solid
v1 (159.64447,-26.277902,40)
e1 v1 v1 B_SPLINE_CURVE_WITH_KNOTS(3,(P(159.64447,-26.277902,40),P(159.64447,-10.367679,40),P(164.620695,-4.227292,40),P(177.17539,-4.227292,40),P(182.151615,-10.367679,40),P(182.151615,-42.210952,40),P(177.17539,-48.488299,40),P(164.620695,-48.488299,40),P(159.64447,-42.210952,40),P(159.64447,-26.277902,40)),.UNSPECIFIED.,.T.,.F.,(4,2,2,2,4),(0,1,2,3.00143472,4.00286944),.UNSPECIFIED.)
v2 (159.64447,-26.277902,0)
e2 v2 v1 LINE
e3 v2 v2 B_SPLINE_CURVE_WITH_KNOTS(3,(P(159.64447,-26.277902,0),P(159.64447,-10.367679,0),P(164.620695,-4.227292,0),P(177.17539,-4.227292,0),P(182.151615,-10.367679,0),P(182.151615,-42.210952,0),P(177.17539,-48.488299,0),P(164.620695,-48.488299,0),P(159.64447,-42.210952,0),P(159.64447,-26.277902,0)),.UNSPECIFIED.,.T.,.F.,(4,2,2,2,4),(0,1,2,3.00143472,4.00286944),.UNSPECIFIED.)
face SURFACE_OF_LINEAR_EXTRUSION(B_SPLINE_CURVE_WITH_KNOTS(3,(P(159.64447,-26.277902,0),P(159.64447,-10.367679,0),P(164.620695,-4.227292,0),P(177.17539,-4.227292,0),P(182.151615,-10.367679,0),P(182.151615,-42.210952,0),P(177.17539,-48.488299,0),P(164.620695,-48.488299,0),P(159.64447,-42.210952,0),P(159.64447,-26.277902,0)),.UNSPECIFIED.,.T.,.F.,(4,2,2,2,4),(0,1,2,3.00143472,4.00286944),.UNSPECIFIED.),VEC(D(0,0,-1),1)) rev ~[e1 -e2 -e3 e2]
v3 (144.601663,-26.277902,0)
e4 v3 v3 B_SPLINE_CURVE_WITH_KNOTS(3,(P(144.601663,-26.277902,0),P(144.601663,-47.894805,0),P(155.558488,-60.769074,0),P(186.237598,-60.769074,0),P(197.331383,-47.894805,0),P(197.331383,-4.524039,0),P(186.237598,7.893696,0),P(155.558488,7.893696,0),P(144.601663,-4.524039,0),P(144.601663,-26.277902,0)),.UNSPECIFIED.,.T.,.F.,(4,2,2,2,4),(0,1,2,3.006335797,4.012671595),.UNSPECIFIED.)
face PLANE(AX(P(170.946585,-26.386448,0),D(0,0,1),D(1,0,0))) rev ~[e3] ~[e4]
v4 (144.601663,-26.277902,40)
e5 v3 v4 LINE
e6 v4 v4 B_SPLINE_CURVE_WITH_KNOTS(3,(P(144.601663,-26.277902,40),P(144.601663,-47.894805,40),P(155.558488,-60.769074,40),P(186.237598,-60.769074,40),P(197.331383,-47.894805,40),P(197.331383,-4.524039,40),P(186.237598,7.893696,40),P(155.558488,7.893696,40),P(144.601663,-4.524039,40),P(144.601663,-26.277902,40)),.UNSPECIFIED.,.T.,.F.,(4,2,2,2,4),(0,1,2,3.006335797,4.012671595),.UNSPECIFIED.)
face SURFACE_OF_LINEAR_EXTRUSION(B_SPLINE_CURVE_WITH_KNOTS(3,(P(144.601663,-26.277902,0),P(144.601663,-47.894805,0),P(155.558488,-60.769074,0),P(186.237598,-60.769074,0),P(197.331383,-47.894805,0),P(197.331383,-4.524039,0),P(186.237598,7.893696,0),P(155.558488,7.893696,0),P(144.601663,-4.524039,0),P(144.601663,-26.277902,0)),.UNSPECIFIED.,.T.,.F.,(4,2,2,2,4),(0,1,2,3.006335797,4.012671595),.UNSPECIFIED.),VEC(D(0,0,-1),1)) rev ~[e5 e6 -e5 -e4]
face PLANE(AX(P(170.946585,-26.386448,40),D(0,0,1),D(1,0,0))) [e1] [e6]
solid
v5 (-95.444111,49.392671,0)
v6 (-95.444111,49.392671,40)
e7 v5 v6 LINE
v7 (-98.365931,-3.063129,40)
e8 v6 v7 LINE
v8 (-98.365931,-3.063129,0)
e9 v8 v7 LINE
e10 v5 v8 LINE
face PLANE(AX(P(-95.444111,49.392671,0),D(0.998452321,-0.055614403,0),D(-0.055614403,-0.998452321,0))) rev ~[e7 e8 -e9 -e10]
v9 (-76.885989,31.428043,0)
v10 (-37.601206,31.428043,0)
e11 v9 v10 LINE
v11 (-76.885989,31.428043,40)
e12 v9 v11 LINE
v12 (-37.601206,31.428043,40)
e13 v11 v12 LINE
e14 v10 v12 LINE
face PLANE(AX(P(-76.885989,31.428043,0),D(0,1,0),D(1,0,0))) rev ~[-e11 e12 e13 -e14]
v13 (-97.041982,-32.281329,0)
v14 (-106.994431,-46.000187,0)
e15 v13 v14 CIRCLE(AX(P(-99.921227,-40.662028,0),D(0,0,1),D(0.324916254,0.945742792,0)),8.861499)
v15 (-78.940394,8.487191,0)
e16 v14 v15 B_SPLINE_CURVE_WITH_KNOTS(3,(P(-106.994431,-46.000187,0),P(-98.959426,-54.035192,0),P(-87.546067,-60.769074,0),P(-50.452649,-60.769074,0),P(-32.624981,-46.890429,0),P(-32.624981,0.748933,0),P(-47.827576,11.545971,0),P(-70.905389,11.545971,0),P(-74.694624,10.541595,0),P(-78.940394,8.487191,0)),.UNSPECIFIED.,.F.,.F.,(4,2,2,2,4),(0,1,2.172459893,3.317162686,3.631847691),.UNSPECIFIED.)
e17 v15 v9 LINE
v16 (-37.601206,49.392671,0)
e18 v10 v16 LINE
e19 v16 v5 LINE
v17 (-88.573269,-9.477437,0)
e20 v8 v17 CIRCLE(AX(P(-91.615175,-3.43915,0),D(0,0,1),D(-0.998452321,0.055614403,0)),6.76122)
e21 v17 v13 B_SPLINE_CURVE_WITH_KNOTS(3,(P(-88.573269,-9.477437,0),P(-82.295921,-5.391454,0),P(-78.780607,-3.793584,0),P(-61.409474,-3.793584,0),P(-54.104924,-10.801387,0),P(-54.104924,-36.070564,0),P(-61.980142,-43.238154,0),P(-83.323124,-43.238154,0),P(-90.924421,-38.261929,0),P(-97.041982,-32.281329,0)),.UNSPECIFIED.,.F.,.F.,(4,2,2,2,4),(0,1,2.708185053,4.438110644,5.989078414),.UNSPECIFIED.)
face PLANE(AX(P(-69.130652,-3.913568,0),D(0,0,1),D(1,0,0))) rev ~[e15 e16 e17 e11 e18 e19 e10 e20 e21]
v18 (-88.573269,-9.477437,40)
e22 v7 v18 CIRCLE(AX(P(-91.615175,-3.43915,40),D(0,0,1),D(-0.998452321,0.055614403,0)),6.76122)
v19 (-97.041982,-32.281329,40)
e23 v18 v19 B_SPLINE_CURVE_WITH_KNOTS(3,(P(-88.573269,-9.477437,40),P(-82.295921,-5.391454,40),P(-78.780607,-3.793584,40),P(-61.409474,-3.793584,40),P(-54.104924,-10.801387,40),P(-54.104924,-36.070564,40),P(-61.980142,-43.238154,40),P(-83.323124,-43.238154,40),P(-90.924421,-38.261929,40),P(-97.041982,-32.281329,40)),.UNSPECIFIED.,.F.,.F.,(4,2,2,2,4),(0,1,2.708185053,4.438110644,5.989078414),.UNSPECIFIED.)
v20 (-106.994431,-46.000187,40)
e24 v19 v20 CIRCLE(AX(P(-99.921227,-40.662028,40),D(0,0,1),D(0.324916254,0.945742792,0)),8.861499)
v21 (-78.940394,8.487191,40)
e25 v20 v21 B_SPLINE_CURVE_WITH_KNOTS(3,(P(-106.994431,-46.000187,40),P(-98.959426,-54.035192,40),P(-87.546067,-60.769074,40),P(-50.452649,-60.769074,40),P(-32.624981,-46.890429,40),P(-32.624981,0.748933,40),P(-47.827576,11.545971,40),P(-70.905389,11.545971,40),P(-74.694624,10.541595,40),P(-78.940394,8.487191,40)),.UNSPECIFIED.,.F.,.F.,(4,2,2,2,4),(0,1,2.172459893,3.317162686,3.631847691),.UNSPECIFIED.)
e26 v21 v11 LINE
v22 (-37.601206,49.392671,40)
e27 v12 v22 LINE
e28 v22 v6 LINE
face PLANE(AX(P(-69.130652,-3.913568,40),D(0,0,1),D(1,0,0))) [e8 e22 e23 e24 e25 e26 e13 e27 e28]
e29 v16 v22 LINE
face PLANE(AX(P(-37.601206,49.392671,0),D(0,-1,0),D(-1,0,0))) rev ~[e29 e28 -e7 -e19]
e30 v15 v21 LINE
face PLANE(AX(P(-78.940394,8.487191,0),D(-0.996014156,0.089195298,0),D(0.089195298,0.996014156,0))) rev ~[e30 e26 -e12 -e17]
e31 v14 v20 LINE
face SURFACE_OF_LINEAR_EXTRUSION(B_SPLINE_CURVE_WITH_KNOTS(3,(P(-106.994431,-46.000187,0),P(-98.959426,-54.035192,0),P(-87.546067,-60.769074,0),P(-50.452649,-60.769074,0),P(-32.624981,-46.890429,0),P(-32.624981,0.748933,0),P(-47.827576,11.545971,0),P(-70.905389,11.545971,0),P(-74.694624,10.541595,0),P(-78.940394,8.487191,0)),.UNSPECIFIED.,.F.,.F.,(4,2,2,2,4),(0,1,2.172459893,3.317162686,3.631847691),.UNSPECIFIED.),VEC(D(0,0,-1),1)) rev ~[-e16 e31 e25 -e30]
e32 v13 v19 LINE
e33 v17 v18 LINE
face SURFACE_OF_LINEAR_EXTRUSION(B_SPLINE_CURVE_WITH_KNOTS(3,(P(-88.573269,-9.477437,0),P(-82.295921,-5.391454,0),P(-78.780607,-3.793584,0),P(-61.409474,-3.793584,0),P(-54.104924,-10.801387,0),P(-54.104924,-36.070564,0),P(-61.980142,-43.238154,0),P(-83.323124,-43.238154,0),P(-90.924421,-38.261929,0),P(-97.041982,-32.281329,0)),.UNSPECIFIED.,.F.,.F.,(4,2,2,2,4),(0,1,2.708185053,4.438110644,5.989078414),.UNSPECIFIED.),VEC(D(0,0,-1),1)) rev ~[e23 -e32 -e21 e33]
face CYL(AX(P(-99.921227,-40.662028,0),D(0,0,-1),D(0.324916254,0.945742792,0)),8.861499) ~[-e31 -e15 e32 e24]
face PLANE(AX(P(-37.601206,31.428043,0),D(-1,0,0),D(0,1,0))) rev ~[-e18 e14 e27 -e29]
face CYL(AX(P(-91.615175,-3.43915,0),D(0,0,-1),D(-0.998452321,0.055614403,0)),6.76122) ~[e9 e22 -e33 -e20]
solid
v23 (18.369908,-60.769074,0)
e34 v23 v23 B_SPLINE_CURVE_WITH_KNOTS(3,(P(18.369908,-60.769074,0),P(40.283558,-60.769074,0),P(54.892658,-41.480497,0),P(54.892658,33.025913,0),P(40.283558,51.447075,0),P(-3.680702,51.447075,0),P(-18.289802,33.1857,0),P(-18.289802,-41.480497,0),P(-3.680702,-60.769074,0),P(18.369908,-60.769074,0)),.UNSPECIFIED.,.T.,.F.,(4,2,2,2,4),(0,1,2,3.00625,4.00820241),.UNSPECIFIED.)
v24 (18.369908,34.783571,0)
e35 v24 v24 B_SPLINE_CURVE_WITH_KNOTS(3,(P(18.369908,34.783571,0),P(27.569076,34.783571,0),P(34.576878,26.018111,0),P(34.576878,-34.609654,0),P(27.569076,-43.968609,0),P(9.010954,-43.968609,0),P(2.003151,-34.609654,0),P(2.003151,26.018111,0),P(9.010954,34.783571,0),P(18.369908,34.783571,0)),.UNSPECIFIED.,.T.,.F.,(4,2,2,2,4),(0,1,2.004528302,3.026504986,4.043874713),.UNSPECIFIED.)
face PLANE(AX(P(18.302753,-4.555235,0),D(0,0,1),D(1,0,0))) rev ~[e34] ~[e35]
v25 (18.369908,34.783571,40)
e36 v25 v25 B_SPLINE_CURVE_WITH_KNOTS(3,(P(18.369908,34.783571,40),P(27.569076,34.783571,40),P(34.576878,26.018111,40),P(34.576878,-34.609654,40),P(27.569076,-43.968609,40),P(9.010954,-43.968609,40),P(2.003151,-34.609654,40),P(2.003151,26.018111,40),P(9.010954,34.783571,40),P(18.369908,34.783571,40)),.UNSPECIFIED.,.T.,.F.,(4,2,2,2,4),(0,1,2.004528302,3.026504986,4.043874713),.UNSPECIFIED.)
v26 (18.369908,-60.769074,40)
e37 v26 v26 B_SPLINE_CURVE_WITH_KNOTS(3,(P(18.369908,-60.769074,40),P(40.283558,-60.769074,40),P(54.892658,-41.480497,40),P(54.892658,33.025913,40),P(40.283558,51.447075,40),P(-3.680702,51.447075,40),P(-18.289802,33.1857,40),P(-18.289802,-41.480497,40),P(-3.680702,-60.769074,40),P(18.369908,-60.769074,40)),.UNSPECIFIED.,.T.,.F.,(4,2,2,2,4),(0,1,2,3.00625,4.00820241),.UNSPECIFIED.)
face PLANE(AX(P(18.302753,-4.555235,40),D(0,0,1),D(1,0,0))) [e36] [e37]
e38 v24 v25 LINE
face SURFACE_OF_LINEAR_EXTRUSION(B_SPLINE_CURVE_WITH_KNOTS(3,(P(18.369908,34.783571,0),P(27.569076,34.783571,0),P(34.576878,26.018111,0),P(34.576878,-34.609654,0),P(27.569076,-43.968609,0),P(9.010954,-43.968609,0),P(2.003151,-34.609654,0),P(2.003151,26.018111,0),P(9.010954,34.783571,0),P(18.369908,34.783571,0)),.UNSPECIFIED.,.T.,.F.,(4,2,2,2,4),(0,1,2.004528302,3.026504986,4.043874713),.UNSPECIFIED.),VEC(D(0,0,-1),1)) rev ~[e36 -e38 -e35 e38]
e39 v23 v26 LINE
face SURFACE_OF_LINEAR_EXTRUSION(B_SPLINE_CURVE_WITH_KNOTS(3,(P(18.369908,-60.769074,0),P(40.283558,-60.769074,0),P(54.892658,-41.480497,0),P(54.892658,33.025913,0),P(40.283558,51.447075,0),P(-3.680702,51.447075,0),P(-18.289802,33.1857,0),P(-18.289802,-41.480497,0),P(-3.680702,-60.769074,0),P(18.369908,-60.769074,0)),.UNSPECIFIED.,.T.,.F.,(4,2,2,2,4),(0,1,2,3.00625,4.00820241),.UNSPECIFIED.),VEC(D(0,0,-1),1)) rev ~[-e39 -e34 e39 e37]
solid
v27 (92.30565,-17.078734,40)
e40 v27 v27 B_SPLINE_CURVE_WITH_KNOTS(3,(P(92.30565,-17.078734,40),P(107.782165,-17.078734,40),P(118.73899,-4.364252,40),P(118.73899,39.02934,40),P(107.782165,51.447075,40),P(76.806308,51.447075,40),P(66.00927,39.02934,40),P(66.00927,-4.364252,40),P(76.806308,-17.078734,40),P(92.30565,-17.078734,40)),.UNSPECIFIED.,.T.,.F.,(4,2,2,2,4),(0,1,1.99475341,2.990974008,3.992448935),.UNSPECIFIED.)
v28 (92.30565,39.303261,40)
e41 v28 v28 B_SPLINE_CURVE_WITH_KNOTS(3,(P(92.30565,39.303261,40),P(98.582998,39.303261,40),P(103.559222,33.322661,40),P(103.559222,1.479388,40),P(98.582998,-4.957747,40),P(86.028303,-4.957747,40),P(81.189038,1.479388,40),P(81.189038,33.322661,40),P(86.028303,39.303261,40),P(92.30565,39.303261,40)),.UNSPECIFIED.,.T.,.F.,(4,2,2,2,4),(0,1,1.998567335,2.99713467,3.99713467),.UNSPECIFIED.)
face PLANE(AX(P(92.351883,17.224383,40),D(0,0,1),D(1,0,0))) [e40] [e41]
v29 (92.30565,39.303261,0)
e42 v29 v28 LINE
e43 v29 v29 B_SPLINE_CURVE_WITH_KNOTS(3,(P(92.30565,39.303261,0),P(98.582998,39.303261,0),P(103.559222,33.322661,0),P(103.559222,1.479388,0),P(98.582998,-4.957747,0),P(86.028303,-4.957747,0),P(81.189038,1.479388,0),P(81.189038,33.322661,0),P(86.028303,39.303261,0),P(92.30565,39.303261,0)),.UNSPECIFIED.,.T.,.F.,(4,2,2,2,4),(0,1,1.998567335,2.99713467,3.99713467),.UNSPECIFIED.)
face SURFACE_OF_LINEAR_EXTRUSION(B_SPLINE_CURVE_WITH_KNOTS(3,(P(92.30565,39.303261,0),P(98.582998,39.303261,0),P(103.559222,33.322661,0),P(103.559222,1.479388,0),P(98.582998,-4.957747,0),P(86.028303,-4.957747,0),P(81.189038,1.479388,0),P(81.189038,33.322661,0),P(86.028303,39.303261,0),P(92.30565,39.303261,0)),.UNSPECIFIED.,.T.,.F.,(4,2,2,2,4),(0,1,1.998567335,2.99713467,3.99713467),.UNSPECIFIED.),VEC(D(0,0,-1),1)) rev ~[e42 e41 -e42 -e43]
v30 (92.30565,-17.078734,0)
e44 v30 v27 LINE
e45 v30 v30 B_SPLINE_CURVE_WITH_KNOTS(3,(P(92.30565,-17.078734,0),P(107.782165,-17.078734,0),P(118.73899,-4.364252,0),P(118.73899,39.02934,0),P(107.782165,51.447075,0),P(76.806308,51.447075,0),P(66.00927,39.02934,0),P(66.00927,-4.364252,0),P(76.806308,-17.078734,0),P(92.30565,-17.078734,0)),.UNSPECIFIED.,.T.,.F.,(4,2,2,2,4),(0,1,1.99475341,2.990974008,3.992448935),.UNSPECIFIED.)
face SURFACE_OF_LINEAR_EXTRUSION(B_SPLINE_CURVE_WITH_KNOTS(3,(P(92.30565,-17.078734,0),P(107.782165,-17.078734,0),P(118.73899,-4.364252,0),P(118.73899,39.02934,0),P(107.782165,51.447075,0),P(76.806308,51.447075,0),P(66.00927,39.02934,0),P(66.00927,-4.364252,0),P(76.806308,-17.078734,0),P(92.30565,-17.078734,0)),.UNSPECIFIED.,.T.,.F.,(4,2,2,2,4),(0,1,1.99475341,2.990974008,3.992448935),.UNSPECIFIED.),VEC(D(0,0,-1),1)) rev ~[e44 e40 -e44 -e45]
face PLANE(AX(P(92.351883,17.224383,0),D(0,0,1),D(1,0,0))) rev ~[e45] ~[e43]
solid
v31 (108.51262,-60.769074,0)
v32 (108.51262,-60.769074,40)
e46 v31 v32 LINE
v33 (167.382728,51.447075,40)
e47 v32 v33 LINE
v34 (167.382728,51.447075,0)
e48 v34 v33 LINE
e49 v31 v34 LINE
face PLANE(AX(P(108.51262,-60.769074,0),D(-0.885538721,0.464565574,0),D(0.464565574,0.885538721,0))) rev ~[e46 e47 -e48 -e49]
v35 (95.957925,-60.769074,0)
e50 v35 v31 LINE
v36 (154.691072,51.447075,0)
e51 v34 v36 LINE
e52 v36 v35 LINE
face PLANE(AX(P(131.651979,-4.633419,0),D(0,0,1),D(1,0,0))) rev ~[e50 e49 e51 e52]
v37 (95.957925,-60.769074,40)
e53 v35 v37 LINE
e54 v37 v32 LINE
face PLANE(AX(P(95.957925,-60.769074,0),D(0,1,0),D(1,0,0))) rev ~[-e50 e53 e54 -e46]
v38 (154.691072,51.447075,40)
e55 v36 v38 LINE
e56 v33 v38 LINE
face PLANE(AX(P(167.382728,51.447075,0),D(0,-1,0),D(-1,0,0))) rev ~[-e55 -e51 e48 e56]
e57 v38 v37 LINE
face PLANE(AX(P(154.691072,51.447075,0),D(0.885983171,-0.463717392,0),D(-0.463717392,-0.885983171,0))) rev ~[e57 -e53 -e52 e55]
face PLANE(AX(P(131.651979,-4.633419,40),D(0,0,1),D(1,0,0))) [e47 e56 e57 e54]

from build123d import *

# Parameters (mm, degrees)
F2_DEPTH = 40


with BuildPart() as f2:
    # F1 (on Top) → F2 (new body)
    with BuildSketch(Plane.XY):
        with BuildLine():
            Line((-37.6012061267, 49.3926707034), (-95.4441113863, 49.3926707034))
            Line((-95.4441113863, 49.3926707034), (-98.3659313836, -3.0631289361))
            ThreePointArc((-98.3659313836, -3.0631289361), (-95.3198653418, -9.0950649064), (-88.5732690488, -9.477436899))
            add(Edge.make_bspline(
                [(-88.5732690488, -9.477436899), (-82.2959213983, -5.3914542465), (-78.780606714, -3.7935839355), (-72.3662987511, -3.7935839355)],
                knots=[0, 0, 0, 0, 1, 1, 1, 1], degree=3))
            add(Edge.make_bspline(
                [(-72.3662987511, -3.7935839355), (-61.4094737612, -3.7935839355), (-54.1049237678, -10.8013865853), (-54.1049237678, -23.3560818864)],
                knots=[0, 0, 0, 0, 1, 1, 1, 1], degree=3))
            add(Edge.make_bspline(
                [(-54.1049237678, -23.3560818864), (-54.1049237678, -36.0705642185), (-61.9801417294, -43.2381538994), (-73.2337140629, -43.2381538994)],
                knots=[0, 0, 0, 0, 1, 1, 1, 1], degree=3))
            add(Edge.make_bspline(
                [(-73.2337140629, -43.2381538994), (-83.3231237411, -43.2381538994), (-90.9244210779, -38.2619292165), (-97.0419816974, -32.2813289094)],
                knots=[0, 0, 0, 0, 1, 1, 1, 1], degree=3))
            ThreePointArc((-97.0419816974, -32.2813289094), (-107.0940288058, -35.4584640814), (-106.9944310633, -46.0001868657))
            add(Edge.make_bspline(
                [(-106.9944310633, -46.0001868657), (-98.9594260706, -54.0351918583), (-87.546066706, -60.7690738834), (-70.4716810966, -60.7690738834)],
                knots=[0, 0, 0, 0, 1, 1, 1, 1], degree=3))
            add(Edge.make_bspline(
                [(-70.4716810966, -60.7690738834), (-50.4526487712, -60.7690738834), (-32.6249814437, -46.8904288961), (-32.6249814437, -22.7854139181)],
                knots=[0, 0, 0, 0, 1, 1, 1, 1], degree=3))
            add(Edge.make_bspline(
                [(-32.6249814437, -22.7854139181), (-32.6249814437, 0.7489330916), (-47.8275761173, 11.5459710505), (-65.9291640695, 11.5459710505)],
                knots=[0, 0, 0, 0, 1, 1, 1, 1], degree=3))
            add(Edge.make_bspline(
                [(-65.9291640695, 11.5459710505), (-70.9053887525, 11.5459710505), (-74.6946240615, 10.5415954264), (-78.9403937451, 8.4871907408)],
                knots=[0, 0, 0, 0, 1, 1, 1, 1], degree=3))
            Line((-78.9403937451, 8.4871907408), (-76.8859890595, 31.4280430636))
            Line((-76.8859890595, 31.4280430636), (-37.6012061267, 31.4280430636))
            Line((-37.6012061267, 31.4280430636), (-37.6012061267, 49.3926707034))
        make_face()
    extrude(amount=F2_DEPTH)


with BuildPart() as f2b:
    # F1 (on Top) → F2, piece 2 (new body)
    with BuildSketch(Plane.XY):
        with BuildLine():
            add(Edge.make_bspline(
                [(54.8926581638, -4.2272915913), (54.8926581638, 33.0259133746), (40.2835581772, 51.4470753891), (18.3699081972, 51.4470753891)],
                knots=[0, 0, 0, 0, 1, 1, 1, 1], degree=3))
            add(Edge.make_bspline(
                [(18.3699081972, 51.4470753891), (-3.6807020952, 51.4470753891), (-18.2898020818, 33.1857004057), (-18.2898020818, -4.2272915913)],
                knots=[0, 0, 0, 0, 1, 1, 1, 1], degree=3))
            add(Edge.make_bspline(
                [(-18.2898020818, -4.2272915913), (-18.2898020818, -41.4804965573), (-3.6807020952, -60.7690738834), (18.3699081972, -60.7690738834)],
                knots=[0, 0, 0, 0, 1, 1, 1, 1], degree=3))
            add(Edge.make_bspline(
                [(18.3699081972, -60.7690738834), (40.2835581772, -60.7690738834), (54.8926581638, -41.4804965573), (54.8926581638, -4.2272915913)],
                knots=[0, 0, 0, 0, 1, 1, 1, 1], degree=3))
        make_face()
        with BuildLine():
            add(Edge.make_bspline(
                [(34.5768784949, -4.2272915913), (34.5768784949, -34.6096542198), (27.569075845, -43.9686088988), (18.3699081972, -43.9686088988)],
                knots=[0, 0, 0, 0, 1, 1, 1, 1], degree=3))
            add(Edge.make_bspline(
                [(18.3699081972, -43.9686088988), (9.0109535183, -43.9686088988), (2.0031508684, -34.6096542198), (2.0031508684, -4.2272915913)],
                knots=[0, 0, 0, 0, 1, 1, 1, 1], degree=3))
            add(Edge.make_bspline(
                [(2.0031508684, -4.2272915913), (2.0031508684, 26.0181107248), (9.0109535183, 34.7835707168), (18.3699081972, 34.7835707168)],
                knots=[0, 0, 0, 0, 1, 1, 1, 1], degree=3))
            add(Edge.make_bspline(
                [(18.3699081972, 34.7835707168), (27.569075845, 34.7835707168), (34.5768784949, 26.0181107248), (34.5768784949, -4.2272915913)],
                knots=[0, 0, 0, 0, 1, 1, 1, 1], degree=3))
        make_face(mode=Mode.SUBTRACT)
    extrude(amount=F2_DEPTH)


with BuildPart() as f2c:
    # F1 (on Top) → F2, piece 3 (new body)
    with BuildSketch(Plane.XY):
        with BuildLine():
            add(Edge.make_bspline(
                [(118.7389904492, 17.3896110452), (118.7389904492, 39.0293404004), (107.7821654593, 51.4470753891), (92.3056501609, 51.4470753891)],
                knots=[0, 0, 0, 0, 1, 1, 1, 1], degree=3))
            add(Edge.make_bspline(
                [(92.3056501609, 51.4470753891), (76.8063081438, 51.4470753891), (66.0092701849, 39.0293404004), (66.0092701849, 17.3896110452)],
                knots=[0, 0, 0, 0, 1, 1, 1, 1], degree=3))
            add(Edge.make_bspline(
                [(66.0092701849, 17.3896110452), (66.0092701849, -4.3642519037), (76.8063081438, -17.0787342358), (92.3056501609, -17.0787342358)],
                knots=[0, 0, 0, 0, 1, 1, 1, 1], degree=3))
            add(Edge.make_bspline(
                [(92.3056501609, -17.0787342358), (107.7821654593, -17.0787342358), (118.7389904492, -4.3642519037), (118.7389904492, 17.3896110452)],
                knots=[0, 0, 0, 0, 1, 1, 1, 1], degree=3))
        make_face()
        with BuildLine():
            add(Edge.make_bspline(
                [(103.5592224944, 17.3896110452), (103.5592224944, 1.479388091), (98.5829978114, -4.9577465907), (92.3056501609, -4.9577465907)],
                knots=[0, 0, 0, 0, 1, 1, 1, 1], degree=3))
            add(Edge.make_bspline(
                [(92.3056501609, -4.9577465907), (86.0283025104, -4.9577465907), (81.1890381398, 1.479388091), (81.1890381398, 17.3896110452)],
                knots=[0, 0, 0, 0, 1, 1, 1, 1], degree=3))
            add(Edge.make_bspline(
                [(81.1890381398, 17.3896110452), (81.1890381398, 33.3226607181), (86.0283025104, 39.3032610251), (92.3056501609, 39.3032610251)],
                knots=[0, 0, 0, 0, 1, 1, 1, 1], degree=3))
            add(Edge.make_bspline(
                [(92.3056501609, 39.3032610251), (98.5829978114, 39.3032610251), (103.5592224944, 33.3226607181), (103.5592224944, 17.3896110452)],
                knots=[0, 0, 0, 0, 1, 1, 1, 1], degree=3))
        make_face(mode=Mode.SUBTRACT)
    extrude(amount=F2_DEPTH)


with BuildPart() as f2d:
    # F1 (on Top) → F2, piece 4 (new body)
    with BuildSketch(Plane.XY):
        Polygon((167.3827280611, 51.4470753891), (154.6910724477, 51.4470753891), (95.9579251576, -60.7690738834), (108.5126204586, -60.7690738834), align=None)
    extrude(amount=F2_DEPTH)


with BuildPart() as f2e:
    # F1 (on Top) → F2, piece 5 (new body)
    with BuildSketch(Plane.XY):
        with BuildLine():
            add(Edge.make_bspline(
                [(170.8980427453, -60.7690738834), (186.2375977313, -60.7690738834), (197.3313830337, -47.8948045202), (197.3313830337, -26.2779018837)],
                knots=[0, 0, 0, 0, 1, 1, 1, 1], degree=3))
            add(Edge.make_bspline(
                [(197.3313830337, -26.2779018837), (197.3313830337, -4.5240389348), (186.2375977313, 7.8936960538), (170.8980427453, 7.8936960538)],
                knots=[0, 0, 0, 0, 1, 1, 1, 1], degree=3))
            add(Edge.make_bspline(
                [(170.8980427453, 7.8936960538), (155.5584877594, 7.8936960538), (144.6016627694, -4.5240389348), (144.6016627694, -26.2779018837)],
                knots=[0, 0, 0, 0, 1, 1, 1, 1], degree=3))
            add(Edge.make_bspline(
                [(144.6016627694, -26.2779018837), (144.6016627694, -47.8948045202), (155.5584877594, -60.7690738834), (170.8980427453, -60.7690738834)],
                knots=[0, 0, 0, 0, 1, 1, 1, 1], degree=3))
        make_face()
        with BuildLine():
            add(Edge.make_bspline(
                [(170.8980427453, -4.2272915913), (177.1753903959, -4.2272915913), (182.1516150788, -10.3676789295), (182.1516150788, -26.2779018837)],
                knots=[0, 0, 0, 0, 1, 1, 1, 1], degree=3))
            add(Edge.make_bspline(
                [(182.1516150788, -26.2779018837), (182.1516150788, -42.2109515566), (177.1753903959, -48.4882992071), (170.8980427453, -48.4882992071)],
                knots=[0, 0, 0, 0, 1, 1, 1, 1], degree=3))
            add(Edge.make_bspline(
                [(170.8980427453, -48.4882992071), (164.6206950948, -48.4882992071), (159.6444704119, -42.2109515566), (159.6444704119, -26.2779018837)],
                knots=[0, 0, 0, 0, 1, 1, 1, 1], degree=3))
            add(Edge.make_bspline(
                [(159.6444704119, -26.2779018837), (159.6444704119, -10.3676789295), (164.6206950948, -4.2272915913), (170.8980427453, -4.2272915913)],
                knots=[0, 0, 0, 0, 1, 1, 1, 1], degree=3))
        make_face(mode=Mode.SUBTRACT)
    extrude(amount=F2_DEPTH)


solid = Compound([f2.part, f2b.part, f2c.part, f2d.part, f2e.part])
